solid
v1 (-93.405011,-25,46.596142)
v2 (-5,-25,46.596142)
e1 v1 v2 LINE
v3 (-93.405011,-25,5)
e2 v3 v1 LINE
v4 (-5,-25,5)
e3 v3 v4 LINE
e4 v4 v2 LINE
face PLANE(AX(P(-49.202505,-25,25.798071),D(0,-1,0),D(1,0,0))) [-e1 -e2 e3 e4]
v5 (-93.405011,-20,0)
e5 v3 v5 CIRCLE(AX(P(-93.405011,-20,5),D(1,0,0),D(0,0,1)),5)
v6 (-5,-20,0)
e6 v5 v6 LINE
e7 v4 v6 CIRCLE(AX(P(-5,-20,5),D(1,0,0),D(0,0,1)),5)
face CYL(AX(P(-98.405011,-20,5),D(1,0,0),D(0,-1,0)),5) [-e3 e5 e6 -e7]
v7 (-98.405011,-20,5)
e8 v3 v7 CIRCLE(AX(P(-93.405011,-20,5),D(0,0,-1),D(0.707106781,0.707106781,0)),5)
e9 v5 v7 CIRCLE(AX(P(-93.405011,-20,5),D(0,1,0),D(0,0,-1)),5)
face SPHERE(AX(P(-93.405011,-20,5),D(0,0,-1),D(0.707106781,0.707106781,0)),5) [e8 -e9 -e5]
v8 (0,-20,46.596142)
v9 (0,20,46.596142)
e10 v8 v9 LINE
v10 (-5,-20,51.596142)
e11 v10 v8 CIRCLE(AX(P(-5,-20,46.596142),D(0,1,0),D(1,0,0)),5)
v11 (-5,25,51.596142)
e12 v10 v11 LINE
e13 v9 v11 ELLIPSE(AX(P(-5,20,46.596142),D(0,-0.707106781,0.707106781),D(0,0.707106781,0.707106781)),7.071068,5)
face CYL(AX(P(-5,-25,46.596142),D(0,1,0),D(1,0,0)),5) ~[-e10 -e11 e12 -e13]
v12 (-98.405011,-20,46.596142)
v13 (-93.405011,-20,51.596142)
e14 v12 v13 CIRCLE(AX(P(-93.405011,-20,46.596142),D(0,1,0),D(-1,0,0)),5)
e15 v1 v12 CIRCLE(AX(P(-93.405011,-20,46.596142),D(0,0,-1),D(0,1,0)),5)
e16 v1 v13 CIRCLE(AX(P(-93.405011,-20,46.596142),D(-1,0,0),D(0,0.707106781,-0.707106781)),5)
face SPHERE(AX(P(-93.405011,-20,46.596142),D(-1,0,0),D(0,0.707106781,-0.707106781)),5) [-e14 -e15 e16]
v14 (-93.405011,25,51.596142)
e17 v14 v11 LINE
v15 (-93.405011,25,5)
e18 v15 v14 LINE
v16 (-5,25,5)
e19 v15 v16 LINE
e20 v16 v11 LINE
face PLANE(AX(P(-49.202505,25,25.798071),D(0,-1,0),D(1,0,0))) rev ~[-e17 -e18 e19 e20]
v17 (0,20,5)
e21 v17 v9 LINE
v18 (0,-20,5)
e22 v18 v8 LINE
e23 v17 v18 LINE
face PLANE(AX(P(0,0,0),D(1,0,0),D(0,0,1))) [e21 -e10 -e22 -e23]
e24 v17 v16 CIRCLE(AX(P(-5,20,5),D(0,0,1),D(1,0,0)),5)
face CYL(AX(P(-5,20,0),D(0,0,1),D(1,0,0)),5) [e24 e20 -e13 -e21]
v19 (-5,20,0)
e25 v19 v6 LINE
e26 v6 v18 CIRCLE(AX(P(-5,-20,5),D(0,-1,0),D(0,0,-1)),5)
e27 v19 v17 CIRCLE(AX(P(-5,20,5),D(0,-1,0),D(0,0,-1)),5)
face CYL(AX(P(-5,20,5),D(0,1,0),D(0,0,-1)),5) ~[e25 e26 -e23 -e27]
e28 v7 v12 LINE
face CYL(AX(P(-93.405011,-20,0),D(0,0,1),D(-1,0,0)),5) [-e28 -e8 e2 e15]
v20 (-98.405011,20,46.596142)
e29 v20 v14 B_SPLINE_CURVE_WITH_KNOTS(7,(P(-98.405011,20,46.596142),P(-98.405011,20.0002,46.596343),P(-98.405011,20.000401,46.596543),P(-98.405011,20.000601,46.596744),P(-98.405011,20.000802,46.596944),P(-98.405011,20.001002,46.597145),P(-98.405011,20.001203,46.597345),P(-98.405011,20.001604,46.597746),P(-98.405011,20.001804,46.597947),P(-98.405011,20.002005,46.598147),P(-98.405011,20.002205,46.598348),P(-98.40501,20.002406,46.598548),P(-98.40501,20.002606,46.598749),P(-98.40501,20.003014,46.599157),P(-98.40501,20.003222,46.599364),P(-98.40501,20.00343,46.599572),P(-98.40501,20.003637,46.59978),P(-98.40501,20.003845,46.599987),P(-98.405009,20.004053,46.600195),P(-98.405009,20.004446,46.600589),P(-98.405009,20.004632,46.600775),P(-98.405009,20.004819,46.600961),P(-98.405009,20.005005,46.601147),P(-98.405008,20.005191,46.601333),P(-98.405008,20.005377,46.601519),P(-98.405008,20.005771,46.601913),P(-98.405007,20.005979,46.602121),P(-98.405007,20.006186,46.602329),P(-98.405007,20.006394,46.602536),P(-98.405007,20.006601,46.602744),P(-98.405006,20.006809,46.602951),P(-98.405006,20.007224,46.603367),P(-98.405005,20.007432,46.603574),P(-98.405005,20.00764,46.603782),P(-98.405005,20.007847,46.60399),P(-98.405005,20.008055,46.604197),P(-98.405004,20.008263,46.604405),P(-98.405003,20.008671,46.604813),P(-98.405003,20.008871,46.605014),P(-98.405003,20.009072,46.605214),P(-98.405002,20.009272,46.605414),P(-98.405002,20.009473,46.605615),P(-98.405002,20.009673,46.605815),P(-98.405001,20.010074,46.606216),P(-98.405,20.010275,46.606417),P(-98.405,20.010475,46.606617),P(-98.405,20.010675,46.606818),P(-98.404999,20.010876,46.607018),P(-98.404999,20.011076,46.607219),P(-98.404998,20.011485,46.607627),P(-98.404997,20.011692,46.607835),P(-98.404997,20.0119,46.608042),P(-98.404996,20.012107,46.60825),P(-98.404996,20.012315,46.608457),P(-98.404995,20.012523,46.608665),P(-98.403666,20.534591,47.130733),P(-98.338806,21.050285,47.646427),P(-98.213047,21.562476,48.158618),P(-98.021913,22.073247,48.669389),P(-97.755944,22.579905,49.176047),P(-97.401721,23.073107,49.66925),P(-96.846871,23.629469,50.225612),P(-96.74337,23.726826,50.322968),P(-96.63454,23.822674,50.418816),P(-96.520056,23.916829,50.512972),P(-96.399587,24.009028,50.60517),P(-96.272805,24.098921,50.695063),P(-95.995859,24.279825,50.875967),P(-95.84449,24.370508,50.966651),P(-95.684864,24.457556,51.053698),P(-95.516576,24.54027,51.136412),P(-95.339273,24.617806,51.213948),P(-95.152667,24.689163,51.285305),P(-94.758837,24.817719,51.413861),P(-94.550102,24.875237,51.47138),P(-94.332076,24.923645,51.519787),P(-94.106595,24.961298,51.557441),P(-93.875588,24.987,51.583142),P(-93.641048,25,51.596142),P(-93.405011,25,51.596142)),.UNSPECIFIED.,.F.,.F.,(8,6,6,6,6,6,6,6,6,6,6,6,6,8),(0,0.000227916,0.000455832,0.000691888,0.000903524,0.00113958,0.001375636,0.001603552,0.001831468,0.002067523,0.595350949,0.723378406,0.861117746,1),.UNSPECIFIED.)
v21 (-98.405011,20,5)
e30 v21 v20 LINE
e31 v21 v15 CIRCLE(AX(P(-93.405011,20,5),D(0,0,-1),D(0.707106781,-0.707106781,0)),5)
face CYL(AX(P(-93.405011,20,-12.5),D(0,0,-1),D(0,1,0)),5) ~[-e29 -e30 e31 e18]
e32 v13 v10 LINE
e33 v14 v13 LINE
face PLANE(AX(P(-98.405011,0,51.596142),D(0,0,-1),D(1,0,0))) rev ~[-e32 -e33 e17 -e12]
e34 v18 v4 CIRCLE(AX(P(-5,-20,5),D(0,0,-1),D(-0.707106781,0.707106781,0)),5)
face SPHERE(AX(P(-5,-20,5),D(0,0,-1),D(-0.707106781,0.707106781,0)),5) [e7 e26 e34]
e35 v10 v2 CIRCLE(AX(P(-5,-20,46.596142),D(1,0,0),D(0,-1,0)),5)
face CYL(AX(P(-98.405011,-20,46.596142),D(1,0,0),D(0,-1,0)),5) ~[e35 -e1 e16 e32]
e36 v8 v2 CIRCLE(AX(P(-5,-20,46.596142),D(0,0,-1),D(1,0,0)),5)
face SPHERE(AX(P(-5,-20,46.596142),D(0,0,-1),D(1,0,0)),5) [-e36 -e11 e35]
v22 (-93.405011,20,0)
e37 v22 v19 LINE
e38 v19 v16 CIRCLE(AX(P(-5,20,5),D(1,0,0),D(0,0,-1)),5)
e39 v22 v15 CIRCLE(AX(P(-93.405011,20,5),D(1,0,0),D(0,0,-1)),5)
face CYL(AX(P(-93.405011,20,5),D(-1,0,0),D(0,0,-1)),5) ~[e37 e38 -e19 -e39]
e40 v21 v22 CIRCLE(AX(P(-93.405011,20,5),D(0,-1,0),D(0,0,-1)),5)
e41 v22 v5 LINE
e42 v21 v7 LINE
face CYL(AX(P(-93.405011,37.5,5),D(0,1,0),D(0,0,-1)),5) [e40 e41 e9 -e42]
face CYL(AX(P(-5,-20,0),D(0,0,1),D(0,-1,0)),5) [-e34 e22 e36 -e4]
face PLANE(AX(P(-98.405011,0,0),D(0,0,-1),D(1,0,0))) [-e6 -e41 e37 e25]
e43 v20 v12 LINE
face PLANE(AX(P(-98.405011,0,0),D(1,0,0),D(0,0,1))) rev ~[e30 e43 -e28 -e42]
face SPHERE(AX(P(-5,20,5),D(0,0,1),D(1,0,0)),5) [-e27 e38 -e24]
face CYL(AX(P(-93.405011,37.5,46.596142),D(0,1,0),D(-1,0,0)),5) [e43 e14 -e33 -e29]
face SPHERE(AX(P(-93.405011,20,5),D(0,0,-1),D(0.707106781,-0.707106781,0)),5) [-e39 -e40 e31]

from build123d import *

# Parameters (mm, degrees)
F0_W         = 98.4050109982
F0_H         = 51.5961423516
F1_DEPTH     = 25
F2_R         = 5
F3_T1_DEPTH  = 76.5961423516
F3_T3_DEPTH  = 57.5
F3_S7_W      = 5
F3_S7_H      = 5
F3_T8_DEPTH  = 5
F3_S13_W     = 5
F3_S13_H     = 5
F3_T14_DEPTH = 5
F4_T1_DEPTH  = 40
F4_T3_DEPTH  = 88.4050109982
F4_S7_W      = 5
F4_S7_H      = 5
F4_T8_DEPTH  = 5
F4_S13_W     = 5
F4_S13_H     = 5
F4_T14_DEPTH = 5
F4_T18_ANGLE = 90


# Not quite as in the source:
# - a fillet or chamfer that OpenCascade refuses, or shapes differently, is made with other operations: its cross-section is extruded or revolved along the edge and cut away or added


with BuildPart() as f1:
    # F0 (on Front) → F1 (new body, symmetric)
    with BuildSketch(Plane.XZ):
        with Locations((-49.2025054991, 25.7980711758)):
            Rectangle(F0_W, F0_H)
    extrude(amount=F1_DEPTH, both=True)

    # F2
    f2_edges = [f1.edges().sort_by_distance(p)[0] for p in [
        (0, -25, 25.798071),
        (0, 0, 51.596142),
        (0, 25, 25.798071),
        (-49.202505, -25, 51.596142),
        (-49.202505, -25, 0),
        (-98.405011, -25, 25.798071),
    ]]
    fillet(f2_edges, radius=F2_R)

    # F3: fillet of radius 5 on 3 edges, made by hand

    # F3_s2 → F3_t1 (cut)
    with BuildSketch(Plane.XY.offset(-12.5)):
        with BuildLine():
            ThreePointArc((-93.4050109982, 25), (-96.9405449042, 23.5355339059), (-98.4050109982, 20))
            Line((-98.4050109982, 20), (-98.4050109982, 25))
            Line((-98.4050109982, 25), (-93.4050109982, 25))
        make_face()
    extrude(amount=F3_T1_DEPTH, mode=Mode.SUBTRACT)

    # F3_s4 → F3_t3 (cut)
    with BuildSketch(Plane.XZ.offset(-37.5)):
        with BuildLine():
            ThreePointArc((-98.4050109982, 46.5961423516), (-96.9405449042, 50.1316762576), (-93.4050109982, 51.5961423516))
            Line((-93.4050109982, 51.5961423516), (-98.4050109982, 51.5961423516))
            Line((-98.4050109982, 51.5961423516), (-98.4050109982, 46.5961423516))
        make_face()
        with BuildLine():
            ThreePointArc((-93.4050109982, 0), (-96.9405449042, 1.4644660941), (-98.4050109982, 5))
            Line((-98.4050109982, 5), (-98.4050109982, 0))
            Line((-98.4050109982, 0), (-93.4050109982, 0))
        make_face()
    extrude(amount=F3_T3_DEPTH, mode=Mode.SUBTRACT)


with BuildPart() as f3_tool6:
    # F3_s7 → F3_t8 (new body)
    with BuildSketch(Plane.XY.offset(5)):
        with Locations((-95.9050109982, -22.5)):
            Rectangle(F3_S7_W, F3_S7_H)
    extrude(amount=-F3_T8_DEPTH)

    # F3_s9 → F3_t10 (revolve, cut)
    with BuildSketch(Plane(origin=(-93.4050109982, -20, 5), x_dir=(0.7071067812, 0.7071067812, 0), z_dir=(-0.7071067812, 0.7071067812, 0))):
        with BuildLine():
            ThreePointArc((0, -5), (5, 0), (0, 5))
            Line((0, 5), (0, -5))
        make_face()
    revolve(axis=Axis((-93.4050109982, -20, 5), (0, 0, -1)), mode=Mode.SUBTRACT)


with BuildPart() as f1_1:
    add(f1.part)

    # F3_t5: cut F3_tool6
    add(f3_tool6.part, mode=Mode.SUBTRACT)


with BuildPart() as f3_tool12:
    # F3_s13 → F3_t14 (new body)
    with BuildSketch(Plane.YZ.offset(-93.4050109982)):
        with Locations((-22.5, 49.0961423516)):
            Rectangle(F3_S13_W, F3_S13_H)
    extrude(amount=-F3_T14_DEPTH)

    # F3_s15 → F3_t16 (revolve, cut)
    with BuildSketch(Plane(origin=(-93.4050109982, -20, 46.5961423516), x_dir=(0, 0.7071067812, -0.7071067812), z_dir=(0, 0.7071067812, 0.7071067812))):
        with BuildLine():
            ThreePointArc((0, -5), (5, 0), (0, 5))
            Line((0, 5), (0, -5))
        make_face()
    revolve(axis=Axis((-93.4050109982, -20, 46.5961423516), (-1, 0, 0)), mode=Mode.SUBTRACT)


with BuildPart() as f1_2:
    add(f1_1.part)

    # F3_t11: cut F3_tool12
    add(f3_tool12.part, mode=Mode.SUBTRACT)

    # F4: fillet of radius 5 on 1 edges, made by hand

    # F4_s2 → F4_t1 (cut)
    with BuildSketch(Plane.XZ.offset(-20)):
        with BuildLine():
            ThreePointArc((-5, 0), (-1.4644660941, 1.4644660941), (0, 5))
            Line((0, 5), (0, 0))
            Line((0, 0), (-5, 0))
        make_face()
    extrude(amount=F4_T1_DEPTH, mode=Mode.SUBTRACT)

    # F4_s4 → F4_t3 (cut)
    with BuildSketch(Plane.YZ.offset(-93.4050109982)):
        with BuildLine():
            ThreePointArc((20, 0), (23.5355339059, 1.4644660941), (25, 5))
            Line((25, 5), (25, 0))
            Line((25, 0), (20, 0))
        make_face()
    extrude(amount=F4_T3_DEPTH, mode=Mode.SUBTRACT)


with BuildPart() as f4_tool6:
    # F4_s7 → F4_t8 (new body)
    with BuildSketch(Plane.XY.offset(5)):
        with Locations((-2.5, -22.5)):
            Rectangle(F4_S7_W, F4_S7_H)
    extrude(amount=-F4_T8_DEPTH)

    # F4_s9 → F4_t10 (revolve, cut)
    with BuildSketch(Plane(origin=(-5, -20, 5), x_dir=(-0.7071067812, 0.7071067812, 0), z_dir=(-0.7071067812, -0.7071067812, 0))):
        with BuildLine():
            ThreePointArc((0, -5), (5, 0), (0, 5))
            Line((0, 5), (0, -5))
        make_face()
    revolve(axis=Axis((-5, -20, 5), (0, 0, -1)), mode=Mode.SUBTRACT)


with BuildPart() as f1_3:
    add(f1_2.part)

    # F4_t5: cut F4_tool6
    add(f4_tool6.part, mode=Mode.SUBTRACT)


with BuildPart() as f4_tool12:
    # F4_s13 → F4_t14 (new body)
    with BuildSketch(Plane.XY.offset(5)):
        with Locations((-95.9050109982, 22.5)):
            Rectangle(F4_S13_W, F4_S13_H)
    extrude(amount=-F4_T14_DEPTH)

    # F4_s15 → F4_t16 (revolve, cut)
    with BuildSketch(Plane(origin=(-93.4050109982, 20, 5), x_dir=(0.7071067812, -0.7071067812, 0), z_dir=(0.7071067812, 0.7071067812, 0))):
        with BuildLine():
            ThreePointArc((0, -5), (5, 0), (0, 5))
            Line((0, 5), (0, -5))
        make_face()
    revolve(axis=Axis((-93.4050109982, 20, 5), (0, 0, -1)), mode=Mode.SUBTRACT)


with BuildPart() as f1_4:
    add(f1_3.part)

    # F4_t11: cut F4_tool12
    add(f4_tool12.part, mode=Mode.SUBTRACT)

    # F4_s17 → F4_t18 (revolve, cut)
    with BuildSketch(Plane.XZ.offset(-20)):
        with BuildLine():
            ThreePointArc((-5, 0), (-1.4644660941, 1.4644660941), (0, 5))
            Line((0, 5), (0, 0))
            Line((0, 0), (-5, 0))
        make_face()
    revolve(axis=Axis((-5, 20, 0), (0, 0, 1)), revolution_arc=F4_T18_ANGLE, mode=Mode.SUBTRACT)


solid = f1_4.part
